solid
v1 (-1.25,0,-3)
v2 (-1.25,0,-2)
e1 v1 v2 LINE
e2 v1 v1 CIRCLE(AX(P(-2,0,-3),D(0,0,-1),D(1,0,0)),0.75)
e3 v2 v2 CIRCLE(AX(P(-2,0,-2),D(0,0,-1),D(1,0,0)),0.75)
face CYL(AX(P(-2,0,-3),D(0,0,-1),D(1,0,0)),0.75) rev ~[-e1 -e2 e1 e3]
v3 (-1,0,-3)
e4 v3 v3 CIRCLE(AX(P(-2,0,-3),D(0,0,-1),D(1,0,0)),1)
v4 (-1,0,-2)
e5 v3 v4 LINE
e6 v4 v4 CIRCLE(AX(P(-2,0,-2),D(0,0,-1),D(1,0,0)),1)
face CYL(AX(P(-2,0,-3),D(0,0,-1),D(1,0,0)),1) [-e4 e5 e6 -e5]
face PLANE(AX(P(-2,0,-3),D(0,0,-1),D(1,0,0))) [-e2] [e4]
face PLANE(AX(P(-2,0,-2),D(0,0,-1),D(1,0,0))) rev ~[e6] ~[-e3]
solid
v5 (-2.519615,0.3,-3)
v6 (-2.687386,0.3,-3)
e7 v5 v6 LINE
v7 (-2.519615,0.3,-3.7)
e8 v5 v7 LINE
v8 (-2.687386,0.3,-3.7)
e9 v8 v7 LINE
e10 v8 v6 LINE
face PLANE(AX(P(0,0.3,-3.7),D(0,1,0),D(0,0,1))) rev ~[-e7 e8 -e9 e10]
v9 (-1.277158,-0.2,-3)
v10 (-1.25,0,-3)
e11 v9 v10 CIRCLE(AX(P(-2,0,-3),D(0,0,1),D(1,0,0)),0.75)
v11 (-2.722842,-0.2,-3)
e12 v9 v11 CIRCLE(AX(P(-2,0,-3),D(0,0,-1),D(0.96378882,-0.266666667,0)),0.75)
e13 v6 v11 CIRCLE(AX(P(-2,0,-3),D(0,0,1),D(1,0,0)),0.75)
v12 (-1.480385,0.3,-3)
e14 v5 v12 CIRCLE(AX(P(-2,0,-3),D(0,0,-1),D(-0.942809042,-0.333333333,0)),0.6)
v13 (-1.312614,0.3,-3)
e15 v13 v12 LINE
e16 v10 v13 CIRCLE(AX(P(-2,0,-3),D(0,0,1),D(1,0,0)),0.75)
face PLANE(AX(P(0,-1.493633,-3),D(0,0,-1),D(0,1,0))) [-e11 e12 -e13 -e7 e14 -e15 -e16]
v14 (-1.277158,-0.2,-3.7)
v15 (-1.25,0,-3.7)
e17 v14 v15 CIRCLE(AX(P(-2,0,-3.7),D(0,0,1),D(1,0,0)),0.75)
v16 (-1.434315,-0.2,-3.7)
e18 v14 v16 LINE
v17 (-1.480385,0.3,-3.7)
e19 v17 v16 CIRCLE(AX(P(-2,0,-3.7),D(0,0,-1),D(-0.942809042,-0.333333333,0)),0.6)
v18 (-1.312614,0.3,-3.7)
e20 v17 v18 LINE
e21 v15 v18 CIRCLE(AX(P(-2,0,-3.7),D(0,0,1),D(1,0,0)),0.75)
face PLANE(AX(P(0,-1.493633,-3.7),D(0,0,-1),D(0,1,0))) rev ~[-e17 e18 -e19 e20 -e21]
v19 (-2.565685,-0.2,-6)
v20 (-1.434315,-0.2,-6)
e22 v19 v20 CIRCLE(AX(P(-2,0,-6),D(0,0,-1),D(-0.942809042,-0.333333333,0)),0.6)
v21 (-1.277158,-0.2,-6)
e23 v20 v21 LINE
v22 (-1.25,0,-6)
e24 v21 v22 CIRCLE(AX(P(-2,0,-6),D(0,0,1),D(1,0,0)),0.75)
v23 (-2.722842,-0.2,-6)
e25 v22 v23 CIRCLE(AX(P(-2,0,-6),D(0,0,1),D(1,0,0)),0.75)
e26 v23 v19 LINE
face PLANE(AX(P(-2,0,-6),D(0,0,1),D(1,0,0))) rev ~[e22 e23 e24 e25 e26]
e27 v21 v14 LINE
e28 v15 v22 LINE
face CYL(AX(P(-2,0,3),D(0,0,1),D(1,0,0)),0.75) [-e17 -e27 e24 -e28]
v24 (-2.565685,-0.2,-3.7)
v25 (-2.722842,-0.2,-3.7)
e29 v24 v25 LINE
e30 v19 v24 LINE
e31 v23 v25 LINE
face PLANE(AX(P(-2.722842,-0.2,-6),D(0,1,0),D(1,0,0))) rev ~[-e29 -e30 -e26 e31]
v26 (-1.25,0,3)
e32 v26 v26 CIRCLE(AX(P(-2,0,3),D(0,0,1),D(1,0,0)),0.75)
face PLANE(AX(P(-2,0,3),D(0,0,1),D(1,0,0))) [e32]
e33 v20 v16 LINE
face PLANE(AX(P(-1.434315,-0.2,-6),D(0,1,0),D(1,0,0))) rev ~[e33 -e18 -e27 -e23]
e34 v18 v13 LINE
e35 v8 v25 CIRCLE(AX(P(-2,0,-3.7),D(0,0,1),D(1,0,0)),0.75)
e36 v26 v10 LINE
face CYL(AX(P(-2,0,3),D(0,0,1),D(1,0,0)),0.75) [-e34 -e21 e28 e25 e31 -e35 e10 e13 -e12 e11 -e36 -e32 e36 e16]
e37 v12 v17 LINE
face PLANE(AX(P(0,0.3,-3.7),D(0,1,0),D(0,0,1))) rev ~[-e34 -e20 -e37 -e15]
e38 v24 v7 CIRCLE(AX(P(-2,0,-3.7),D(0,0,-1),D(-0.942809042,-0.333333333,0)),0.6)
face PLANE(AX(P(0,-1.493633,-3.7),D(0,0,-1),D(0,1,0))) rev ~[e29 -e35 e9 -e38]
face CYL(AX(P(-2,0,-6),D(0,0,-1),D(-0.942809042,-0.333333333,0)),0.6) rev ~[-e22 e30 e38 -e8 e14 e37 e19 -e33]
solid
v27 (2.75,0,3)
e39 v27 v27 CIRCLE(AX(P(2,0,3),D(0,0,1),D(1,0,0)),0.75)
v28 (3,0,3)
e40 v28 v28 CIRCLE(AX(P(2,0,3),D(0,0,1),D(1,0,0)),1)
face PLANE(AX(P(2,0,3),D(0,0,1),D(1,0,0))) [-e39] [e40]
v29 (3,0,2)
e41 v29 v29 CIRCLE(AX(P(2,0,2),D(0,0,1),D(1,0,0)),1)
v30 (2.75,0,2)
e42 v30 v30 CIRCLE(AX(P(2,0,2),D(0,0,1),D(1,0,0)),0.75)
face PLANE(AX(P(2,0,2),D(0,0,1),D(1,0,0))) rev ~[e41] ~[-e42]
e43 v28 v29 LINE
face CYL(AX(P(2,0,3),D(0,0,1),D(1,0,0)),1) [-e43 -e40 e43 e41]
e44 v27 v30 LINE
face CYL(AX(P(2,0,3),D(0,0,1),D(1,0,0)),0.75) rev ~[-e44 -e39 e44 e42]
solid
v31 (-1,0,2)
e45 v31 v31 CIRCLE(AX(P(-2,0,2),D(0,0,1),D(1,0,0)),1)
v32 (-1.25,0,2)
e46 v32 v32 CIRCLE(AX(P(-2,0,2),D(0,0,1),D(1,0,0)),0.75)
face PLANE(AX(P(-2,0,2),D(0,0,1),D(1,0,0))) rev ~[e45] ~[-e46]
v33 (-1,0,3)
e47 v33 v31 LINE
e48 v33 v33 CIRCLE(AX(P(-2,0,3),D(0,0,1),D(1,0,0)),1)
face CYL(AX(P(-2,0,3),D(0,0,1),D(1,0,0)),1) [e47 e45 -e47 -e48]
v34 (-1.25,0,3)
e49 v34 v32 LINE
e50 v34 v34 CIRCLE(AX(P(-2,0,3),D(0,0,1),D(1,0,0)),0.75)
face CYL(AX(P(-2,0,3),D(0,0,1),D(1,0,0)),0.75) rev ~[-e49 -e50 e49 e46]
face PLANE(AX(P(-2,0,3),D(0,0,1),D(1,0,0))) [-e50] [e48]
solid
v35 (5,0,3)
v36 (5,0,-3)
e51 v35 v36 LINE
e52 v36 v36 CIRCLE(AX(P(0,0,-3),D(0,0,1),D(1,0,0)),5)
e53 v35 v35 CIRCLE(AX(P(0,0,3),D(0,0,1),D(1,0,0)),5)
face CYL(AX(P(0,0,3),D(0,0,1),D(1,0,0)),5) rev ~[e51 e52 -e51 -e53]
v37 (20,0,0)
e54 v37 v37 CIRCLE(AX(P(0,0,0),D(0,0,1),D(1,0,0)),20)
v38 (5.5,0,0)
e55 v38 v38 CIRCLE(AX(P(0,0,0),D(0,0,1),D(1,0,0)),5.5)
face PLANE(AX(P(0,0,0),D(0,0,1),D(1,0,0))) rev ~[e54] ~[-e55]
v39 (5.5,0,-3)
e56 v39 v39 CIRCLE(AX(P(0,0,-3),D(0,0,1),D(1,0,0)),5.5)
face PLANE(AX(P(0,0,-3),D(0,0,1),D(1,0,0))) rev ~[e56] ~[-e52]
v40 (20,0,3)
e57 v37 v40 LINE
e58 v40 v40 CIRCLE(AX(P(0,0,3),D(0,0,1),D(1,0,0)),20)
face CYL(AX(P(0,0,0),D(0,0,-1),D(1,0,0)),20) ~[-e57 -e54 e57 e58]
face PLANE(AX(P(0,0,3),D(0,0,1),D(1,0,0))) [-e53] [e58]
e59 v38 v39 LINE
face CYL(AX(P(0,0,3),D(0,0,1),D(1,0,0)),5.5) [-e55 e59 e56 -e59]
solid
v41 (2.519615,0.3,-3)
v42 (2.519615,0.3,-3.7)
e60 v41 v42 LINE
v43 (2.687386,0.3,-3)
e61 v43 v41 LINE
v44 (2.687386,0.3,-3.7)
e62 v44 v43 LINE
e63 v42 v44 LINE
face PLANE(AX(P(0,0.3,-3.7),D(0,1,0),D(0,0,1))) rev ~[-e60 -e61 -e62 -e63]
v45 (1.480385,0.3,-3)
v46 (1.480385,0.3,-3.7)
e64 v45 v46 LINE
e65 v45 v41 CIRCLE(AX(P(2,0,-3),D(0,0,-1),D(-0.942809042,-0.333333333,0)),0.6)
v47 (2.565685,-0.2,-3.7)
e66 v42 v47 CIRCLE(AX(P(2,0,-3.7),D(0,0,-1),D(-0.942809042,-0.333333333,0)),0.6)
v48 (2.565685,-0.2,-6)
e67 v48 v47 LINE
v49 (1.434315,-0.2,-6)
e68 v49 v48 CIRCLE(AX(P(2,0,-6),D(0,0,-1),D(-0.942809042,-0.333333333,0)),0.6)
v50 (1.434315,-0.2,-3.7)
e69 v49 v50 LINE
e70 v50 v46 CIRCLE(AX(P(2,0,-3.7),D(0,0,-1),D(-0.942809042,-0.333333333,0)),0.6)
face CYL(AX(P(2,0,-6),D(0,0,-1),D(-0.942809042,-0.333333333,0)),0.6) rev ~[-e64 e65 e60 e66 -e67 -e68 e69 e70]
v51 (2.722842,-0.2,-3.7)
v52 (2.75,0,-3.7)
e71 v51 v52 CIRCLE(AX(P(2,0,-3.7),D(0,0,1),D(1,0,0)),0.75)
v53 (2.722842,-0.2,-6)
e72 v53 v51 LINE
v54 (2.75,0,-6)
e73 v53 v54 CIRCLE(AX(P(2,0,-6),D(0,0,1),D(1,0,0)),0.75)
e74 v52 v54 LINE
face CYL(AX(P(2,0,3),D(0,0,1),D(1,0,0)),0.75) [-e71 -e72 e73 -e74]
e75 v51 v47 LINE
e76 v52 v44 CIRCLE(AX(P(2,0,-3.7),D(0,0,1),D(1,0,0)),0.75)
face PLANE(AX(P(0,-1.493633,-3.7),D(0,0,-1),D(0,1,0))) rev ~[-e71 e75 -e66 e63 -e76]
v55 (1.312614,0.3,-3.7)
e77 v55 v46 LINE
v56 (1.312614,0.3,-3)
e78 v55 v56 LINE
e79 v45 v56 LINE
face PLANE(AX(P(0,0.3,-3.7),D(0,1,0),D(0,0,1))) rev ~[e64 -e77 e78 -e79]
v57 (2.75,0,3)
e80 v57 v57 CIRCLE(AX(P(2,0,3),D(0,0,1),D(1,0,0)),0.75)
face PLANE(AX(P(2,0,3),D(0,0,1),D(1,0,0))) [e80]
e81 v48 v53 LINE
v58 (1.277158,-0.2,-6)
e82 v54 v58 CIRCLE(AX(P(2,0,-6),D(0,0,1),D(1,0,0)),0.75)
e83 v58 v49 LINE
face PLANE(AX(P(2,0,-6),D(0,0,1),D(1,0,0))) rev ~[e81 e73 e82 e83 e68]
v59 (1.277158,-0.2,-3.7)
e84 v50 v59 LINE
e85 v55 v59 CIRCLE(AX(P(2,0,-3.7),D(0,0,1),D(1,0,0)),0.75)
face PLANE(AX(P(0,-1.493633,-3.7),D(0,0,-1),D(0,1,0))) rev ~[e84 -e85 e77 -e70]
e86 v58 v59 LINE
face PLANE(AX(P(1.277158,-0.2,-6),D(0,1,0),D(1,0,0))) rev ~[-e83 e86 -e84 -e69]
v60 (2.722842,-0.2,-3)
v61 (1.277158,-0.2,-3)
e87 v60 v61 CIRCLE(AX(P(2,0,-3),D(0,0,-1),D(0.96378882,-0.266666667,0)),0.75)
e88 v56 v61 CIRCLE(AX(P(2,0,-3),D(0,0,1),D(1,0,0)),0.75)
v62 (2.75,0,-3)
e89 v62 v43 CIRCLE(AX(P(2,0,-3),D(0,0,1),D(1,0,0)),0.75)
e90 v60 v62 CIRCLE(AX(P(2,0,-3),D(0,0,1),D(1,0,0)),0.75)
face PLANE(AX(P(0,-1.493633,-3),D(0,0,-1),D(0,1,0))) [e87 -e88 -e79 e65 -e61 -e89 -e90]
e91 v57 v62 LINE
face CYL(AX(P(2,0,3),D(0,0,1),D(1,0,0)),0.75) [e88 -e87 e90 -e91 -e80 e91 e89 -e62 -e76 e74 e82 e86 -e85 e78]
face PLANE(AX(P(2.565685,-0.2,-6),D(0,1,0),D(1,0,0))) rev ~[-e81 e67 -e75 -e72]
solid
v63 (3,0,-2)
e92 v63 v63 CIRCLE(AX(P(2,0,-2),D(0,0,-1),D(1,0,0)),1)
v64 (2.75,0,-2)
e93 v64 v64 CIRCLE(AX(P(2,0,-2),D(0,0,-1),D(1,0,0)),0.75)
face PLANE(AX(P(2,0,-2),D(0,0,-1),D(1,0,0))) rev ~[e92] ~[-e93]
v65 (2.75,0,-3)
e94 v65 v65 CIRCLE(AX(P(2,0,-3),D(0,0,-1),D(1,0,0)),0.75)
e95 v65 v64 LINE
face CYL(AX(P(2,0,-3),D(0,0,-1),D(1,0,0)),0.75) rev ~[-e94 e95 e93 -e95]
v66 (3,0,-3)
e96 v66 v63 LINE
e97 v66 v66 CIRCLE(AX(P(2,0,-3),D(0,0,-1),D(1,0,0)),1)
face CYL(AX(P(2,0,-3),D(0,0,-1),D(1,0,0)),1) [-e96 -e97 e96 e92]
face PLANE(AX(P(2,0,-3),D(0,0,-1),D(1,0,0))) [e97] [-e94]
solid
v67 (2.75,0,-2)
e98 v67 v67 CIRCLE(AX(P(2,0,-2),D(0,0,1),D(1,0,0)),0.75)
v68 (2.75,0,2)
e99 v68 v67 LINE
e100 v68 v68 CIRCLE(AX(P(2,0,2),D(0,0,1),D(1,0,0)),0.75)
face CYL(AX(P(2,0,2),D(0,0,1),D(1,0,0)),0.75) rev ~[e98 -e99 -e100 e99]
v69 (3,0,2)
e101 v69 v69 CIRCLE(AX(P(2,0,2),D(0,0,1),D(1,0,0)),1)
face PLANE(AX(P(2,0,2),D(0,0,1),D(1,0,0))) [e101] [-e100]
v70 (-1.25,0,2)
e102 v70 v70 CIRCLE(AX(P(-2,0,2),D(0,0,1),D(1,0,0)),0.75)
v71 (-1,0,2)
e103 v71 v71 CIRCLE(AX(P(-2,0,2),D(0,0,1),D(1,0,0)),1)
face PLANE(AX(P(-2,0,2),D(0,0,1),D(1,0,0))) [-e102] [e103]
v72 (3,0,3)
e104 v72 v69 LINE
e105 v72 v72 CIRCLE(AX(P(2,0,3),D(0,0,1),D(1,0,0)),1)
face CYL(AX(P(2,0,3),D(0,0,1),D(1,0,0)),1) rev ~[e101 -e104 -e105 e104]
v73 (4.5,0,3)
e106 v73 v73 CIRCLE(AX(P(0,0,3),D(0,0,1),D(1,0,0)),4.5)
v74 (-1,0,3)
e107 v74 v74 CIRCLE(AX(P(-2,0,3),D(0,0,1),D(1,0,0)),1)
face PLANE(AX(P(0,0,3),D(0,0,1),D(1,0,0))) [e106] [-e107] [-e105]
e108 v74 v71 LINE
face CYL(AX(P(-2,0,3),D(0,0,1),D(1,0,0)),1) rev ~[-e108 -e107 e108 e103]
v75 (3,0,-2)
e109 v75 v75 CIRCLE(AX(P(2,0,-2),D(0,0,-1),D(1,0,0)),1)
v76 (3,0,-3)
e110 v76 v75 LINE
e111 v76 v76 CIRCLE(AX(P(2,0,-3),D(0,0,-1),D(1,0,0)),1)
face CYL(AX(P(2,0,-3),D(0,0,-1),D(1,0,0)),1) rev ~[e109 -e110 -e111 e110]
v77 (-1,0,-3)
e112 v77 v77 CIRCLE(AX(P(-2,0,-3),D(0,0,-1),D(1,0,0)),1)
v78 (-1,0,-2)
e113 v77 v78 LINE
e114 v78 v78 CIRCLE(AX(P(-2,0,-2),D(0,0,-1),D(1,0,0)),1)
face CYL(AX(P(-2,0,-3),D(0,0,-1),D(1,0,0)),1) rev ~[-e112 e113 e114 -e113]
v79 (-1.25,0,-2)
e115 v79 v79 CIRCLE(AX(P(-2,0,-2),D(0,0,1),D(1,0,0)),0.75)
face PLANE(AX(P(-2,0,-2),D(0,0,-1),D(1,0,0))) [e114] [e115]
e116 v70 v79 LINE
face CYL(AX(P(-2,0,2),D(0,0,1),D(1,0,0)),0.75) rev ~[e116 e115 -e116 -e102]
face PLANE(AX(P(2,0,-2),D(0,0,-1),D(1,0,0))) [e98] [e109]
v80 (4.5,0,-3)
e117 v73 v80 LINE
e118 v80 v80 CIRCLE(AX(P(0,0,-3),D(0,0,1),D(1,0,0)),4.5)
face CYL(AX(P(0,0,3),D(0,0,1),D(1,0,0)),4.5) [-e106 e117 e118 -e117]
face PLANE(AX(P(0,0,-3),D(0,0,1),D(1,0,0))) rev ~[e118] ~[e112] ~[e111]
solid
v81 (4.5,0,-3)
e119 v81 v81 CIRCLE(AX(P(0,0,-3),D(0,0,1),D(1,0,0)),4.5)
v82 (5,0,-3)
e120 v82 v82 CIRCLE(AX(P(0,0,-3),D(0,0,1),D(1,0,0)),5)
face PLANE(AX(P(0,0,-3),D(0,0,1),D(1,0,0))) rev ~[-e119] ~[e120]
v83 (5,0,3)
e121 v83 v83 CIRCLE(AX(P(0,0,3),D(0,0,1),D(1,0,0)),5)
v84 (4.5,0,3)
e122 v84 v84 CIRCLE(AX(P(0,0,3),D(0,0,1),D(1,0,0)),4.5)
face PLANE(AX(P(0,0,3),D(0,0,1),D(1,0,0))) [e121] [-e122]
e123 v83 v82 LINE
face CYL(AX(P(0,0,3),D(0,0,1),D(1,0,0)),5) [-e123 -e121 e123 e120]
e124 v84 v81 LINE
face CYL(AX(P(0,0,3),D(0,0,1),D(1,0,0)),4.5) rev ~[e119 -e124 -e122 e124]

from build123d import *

# Parameters (mm, degrees)
F0_R      = 20
F0_R_2    = 5.5
F1_DEPTH  = 3
F2_R      = 5.5
F2_R_2    = 5
F3_DEPTH  = 6
F4_R      = 5
F4_R_2    = 4.5
F5_DEPTH  = 6
F6_R      = 4.5
F7_DEPTH  = 6
F8_R      = 1
F9_DEPTH  = 1
F11_R     = 1
F11_R_2   = 0.75
F12_DEPTH = 1
F13_R     = 0.75
F14_DEPTH = 9
F16_DEPTH = 3
F17_W     = 6.3846809013
F17_H     = 1
F18_DEPTH = 12.5
F19_W     = 1.7936326425
F19_H     = 0.7
F20_DEPTH = 12.5
F10_R     = 1
F21_DEPTH = 1
F22_R     = 1
F22_R_2   = 0.75
F23_DEPTH = 1
F24_R     = 0.75
F25_DEPTH = 25


with BuildPart() as f1:
    # F0 (on Top) → F1 (new body)
    with BuildSketch(Plane.XY):
        Circle(F0_R)
        Circle(F0_R_2, mode=Mode.SUBTRACT)
    extrude(amount=F1_DEPTH)

    # F2 (on face) → F3 (join)
    with BuildSketch(Plane.XY.offset(3)):
        Circle(F2_R)
        Circle(F2_R_2, mode=Mode.SUBTRACT)
    extrude(amount=-F3_DEPTH)

    # F17 (on Right) → F18 (cut, symmetric)
    with BuildSketch(Plane.YZ):
        with Locations((-2.9923404506, -9.5)):
            Rectangle(F17_W, F17_H)
    extrude(amount=F18_DEPTH, both=True, mode=Mode.SUBTRACT)


with BuildPart() as f5:
    # F4 (on face) → F5 (new body)
    with BuildSketch(Plane.XY.offset(3)):
        Circle(F4_R)
        Circle(F4_R_2, mode=Mode.SUBTRACT)
    extrude(amount=-F5_DEPTH)


with BuildPart() as f7:
    # F6 (on face) → F7 (new body)
    with BuildSketch(Plane.XY.offset(3)):
        Circle(F6_R)
    extrude(amount=-F7_DEPTH)

    # F8 (on face) → F9 (cut)
    with BuildSketch(Plane.XY.offset(3)):
        with Locations((-2, 0)):
            Circle(F8_R)
        with Locations((2, 0)):
            Circle(F8_R)
    extrude(amount=-F9_DEPTH, mode=Mode.SUBTRACT)

    # F10 (on face) → F21 (cut)
    with BuildSketch(Plane(origin=(0, 0, -3), x_dir=(1, 0, 0), z_dir=(0, 0, -1))):
        with Locations((-2, 0)):
            Circle(F10_R)
        with Locations((2, 0)):
            Circle(F10_R)
    extrude(amount=-F21_DEPTH, mode=Mode.SUBTRACT)

    # F24 (on face) → F25 (cut)
    with BuildSketch(Plane.XY.offset(2)):
        with Locations((-2, 0)):
            Circle(F24_R)
        with Locations((2, 0)):
            Circle(F24_R)
    extrude(amount=-F25_DEPTH, mode=Mode.SUBTRACT)


with BuildPart() as f12:
    # F11 (on face) → F12 (new body)
    with BuildSketch(Plane.XY.offset(3)):
        with Locations((-2, 0)):
            Circle(F11_R)
        with Locations((-2, 0)):
            Circle(F11_R_2, mode=Mode.SUBTRACT)
    extrude(amount=-F12_DEPTH)


with BuildPart() as f12b:
    # F11 (on face) → F12, piece 2 (new body)
    with BuildSketch(Plane.XY.offset(3)):
        with Locations((2, 0)):
            Circle(F11_R)
        with Locations((2, 0)):
            Circle(F11_R_2, mode=Mode.SUBTRACT)
    extrude(amount=-F12_DEPTH)


with BuildPart() as f14:
    # F13 (on face) → F14 (new body)
    with BuildSketch(Plane.XY.offset(3)):
        with Locations((-2, 0)):
            Circle(F13_R)
    extrude(amount=-F14_DEPTH)


with BuildPart() as f14b:
    # F13 (on face) → F14, piece 2 (new body)
    with BuildSketch(Plane.XY.offset(3)):
        with Locations((2, 0)):
            Circle(F13_R)
    extrude(amount=-F14_DEPTH)


with BuildPart() as f16_tool:
    # F15 (on face) → F16 (new body)
    with BuildSketch(Plane(origin=(0, 0, -6), x_dir=(1, 0, 0), z_dir=(0, 0, -1))):
        with BuildLine():
            Line((-1.4343145751, 0.2), (-1.2771583853, 0.2))
            ThreePointArc((-1.2771583853, 0.2), (-2, 0.75), (-2.7228416147, 0.2))
            Line((-2.7228416147, 0.2), (-2.5656854249, 0.2))
            ThreePointArc((-2.5656854249, 0.2), (-2, -0.6), (-1.4343145751, 0.2))
        make_face()
        with BuildLine():
            Line((2.5656854249, 0.2), (2.7228416147, 0.2))
            ThreePointArc((2.7228416147, 0.2), (2, 0.75), (1.2771583853, 0.2))
            Line((1.2771583853, 0.2), (1.4343145751, 0.2))
            ThreePointArc((1.4343145751, 0.2), (2, -0.6), (2.5656854249, 0.2))
        make_face()
    extrude(amount=-F16_DEPTH)


with BuildPart() as f14_1:
    add(f14.part)

    # F16: cut by f16_tool
    add(f16_tool.part, mode=Mode.SUBTRACT)


with BuildPart() as f14b_1:
    add(f14b.part)

    # F16: cut by f16_tool
    add(f16_tool.part, mode=Mode.SUBTRACT)


with BuildPart() as f20_tool:
    # F19 (on Right) → F20 (new body, symmetric)
    with BuildSketch(Plane.YZ):
        with Locations((-0.5968163213, -3.35)):
            Rectangle(F19_W, F19_H)
    extrude(amount=F20_DEPTH, both=True)


with BuildPart() as f14_2:
    add(f14_1.part)

    # F20: cut by f20_tool
    add(f20_tool.part, mode=Mode.SUBTRACT)


with BuildPart() as f14b_2:
    add(f14b_1.part)

    # F20: cut by f20_tool
    add(f20_tool.part, mode=Mode.SUBTRACT)


with BuildPart() as f23:
    # F22 (on face) → F23 (new body)
    with BuildSketch(Plane(origin=(0, 0, -3), x_dir=(1, 0, 0), z_dir=(0, 0, -1))):
        with Locations((-2, 0)):
            Circle(F22_R)
        with Locations((-2, 0)):
            Circle(F22_R_2, mode=Mode.SUBTRACT)
    extrude(amount=-F23_DEPTH)


with BuildPart() as f23b:
    # F22 (on face) → F23, piece 2 (new body)
    with BuildSketch(Plane(origin=(0, 0, -3), x_dir=(1, 0, 0), z_dir=(0, 0, -1))):
        with Locations((2, 0)):
            Circle(F22_R)
        with Locations((2, 0)):
            Circle(F22_R_2, mode=Mode.SUBTRACT)
    extrude(amount=-F23_DEPTH)


solid = Compound([f1.part, f5.part, f7.part, f12.part, f12b.part, f14_2.part, f14b_2.part, f23.part, f23b.part])
